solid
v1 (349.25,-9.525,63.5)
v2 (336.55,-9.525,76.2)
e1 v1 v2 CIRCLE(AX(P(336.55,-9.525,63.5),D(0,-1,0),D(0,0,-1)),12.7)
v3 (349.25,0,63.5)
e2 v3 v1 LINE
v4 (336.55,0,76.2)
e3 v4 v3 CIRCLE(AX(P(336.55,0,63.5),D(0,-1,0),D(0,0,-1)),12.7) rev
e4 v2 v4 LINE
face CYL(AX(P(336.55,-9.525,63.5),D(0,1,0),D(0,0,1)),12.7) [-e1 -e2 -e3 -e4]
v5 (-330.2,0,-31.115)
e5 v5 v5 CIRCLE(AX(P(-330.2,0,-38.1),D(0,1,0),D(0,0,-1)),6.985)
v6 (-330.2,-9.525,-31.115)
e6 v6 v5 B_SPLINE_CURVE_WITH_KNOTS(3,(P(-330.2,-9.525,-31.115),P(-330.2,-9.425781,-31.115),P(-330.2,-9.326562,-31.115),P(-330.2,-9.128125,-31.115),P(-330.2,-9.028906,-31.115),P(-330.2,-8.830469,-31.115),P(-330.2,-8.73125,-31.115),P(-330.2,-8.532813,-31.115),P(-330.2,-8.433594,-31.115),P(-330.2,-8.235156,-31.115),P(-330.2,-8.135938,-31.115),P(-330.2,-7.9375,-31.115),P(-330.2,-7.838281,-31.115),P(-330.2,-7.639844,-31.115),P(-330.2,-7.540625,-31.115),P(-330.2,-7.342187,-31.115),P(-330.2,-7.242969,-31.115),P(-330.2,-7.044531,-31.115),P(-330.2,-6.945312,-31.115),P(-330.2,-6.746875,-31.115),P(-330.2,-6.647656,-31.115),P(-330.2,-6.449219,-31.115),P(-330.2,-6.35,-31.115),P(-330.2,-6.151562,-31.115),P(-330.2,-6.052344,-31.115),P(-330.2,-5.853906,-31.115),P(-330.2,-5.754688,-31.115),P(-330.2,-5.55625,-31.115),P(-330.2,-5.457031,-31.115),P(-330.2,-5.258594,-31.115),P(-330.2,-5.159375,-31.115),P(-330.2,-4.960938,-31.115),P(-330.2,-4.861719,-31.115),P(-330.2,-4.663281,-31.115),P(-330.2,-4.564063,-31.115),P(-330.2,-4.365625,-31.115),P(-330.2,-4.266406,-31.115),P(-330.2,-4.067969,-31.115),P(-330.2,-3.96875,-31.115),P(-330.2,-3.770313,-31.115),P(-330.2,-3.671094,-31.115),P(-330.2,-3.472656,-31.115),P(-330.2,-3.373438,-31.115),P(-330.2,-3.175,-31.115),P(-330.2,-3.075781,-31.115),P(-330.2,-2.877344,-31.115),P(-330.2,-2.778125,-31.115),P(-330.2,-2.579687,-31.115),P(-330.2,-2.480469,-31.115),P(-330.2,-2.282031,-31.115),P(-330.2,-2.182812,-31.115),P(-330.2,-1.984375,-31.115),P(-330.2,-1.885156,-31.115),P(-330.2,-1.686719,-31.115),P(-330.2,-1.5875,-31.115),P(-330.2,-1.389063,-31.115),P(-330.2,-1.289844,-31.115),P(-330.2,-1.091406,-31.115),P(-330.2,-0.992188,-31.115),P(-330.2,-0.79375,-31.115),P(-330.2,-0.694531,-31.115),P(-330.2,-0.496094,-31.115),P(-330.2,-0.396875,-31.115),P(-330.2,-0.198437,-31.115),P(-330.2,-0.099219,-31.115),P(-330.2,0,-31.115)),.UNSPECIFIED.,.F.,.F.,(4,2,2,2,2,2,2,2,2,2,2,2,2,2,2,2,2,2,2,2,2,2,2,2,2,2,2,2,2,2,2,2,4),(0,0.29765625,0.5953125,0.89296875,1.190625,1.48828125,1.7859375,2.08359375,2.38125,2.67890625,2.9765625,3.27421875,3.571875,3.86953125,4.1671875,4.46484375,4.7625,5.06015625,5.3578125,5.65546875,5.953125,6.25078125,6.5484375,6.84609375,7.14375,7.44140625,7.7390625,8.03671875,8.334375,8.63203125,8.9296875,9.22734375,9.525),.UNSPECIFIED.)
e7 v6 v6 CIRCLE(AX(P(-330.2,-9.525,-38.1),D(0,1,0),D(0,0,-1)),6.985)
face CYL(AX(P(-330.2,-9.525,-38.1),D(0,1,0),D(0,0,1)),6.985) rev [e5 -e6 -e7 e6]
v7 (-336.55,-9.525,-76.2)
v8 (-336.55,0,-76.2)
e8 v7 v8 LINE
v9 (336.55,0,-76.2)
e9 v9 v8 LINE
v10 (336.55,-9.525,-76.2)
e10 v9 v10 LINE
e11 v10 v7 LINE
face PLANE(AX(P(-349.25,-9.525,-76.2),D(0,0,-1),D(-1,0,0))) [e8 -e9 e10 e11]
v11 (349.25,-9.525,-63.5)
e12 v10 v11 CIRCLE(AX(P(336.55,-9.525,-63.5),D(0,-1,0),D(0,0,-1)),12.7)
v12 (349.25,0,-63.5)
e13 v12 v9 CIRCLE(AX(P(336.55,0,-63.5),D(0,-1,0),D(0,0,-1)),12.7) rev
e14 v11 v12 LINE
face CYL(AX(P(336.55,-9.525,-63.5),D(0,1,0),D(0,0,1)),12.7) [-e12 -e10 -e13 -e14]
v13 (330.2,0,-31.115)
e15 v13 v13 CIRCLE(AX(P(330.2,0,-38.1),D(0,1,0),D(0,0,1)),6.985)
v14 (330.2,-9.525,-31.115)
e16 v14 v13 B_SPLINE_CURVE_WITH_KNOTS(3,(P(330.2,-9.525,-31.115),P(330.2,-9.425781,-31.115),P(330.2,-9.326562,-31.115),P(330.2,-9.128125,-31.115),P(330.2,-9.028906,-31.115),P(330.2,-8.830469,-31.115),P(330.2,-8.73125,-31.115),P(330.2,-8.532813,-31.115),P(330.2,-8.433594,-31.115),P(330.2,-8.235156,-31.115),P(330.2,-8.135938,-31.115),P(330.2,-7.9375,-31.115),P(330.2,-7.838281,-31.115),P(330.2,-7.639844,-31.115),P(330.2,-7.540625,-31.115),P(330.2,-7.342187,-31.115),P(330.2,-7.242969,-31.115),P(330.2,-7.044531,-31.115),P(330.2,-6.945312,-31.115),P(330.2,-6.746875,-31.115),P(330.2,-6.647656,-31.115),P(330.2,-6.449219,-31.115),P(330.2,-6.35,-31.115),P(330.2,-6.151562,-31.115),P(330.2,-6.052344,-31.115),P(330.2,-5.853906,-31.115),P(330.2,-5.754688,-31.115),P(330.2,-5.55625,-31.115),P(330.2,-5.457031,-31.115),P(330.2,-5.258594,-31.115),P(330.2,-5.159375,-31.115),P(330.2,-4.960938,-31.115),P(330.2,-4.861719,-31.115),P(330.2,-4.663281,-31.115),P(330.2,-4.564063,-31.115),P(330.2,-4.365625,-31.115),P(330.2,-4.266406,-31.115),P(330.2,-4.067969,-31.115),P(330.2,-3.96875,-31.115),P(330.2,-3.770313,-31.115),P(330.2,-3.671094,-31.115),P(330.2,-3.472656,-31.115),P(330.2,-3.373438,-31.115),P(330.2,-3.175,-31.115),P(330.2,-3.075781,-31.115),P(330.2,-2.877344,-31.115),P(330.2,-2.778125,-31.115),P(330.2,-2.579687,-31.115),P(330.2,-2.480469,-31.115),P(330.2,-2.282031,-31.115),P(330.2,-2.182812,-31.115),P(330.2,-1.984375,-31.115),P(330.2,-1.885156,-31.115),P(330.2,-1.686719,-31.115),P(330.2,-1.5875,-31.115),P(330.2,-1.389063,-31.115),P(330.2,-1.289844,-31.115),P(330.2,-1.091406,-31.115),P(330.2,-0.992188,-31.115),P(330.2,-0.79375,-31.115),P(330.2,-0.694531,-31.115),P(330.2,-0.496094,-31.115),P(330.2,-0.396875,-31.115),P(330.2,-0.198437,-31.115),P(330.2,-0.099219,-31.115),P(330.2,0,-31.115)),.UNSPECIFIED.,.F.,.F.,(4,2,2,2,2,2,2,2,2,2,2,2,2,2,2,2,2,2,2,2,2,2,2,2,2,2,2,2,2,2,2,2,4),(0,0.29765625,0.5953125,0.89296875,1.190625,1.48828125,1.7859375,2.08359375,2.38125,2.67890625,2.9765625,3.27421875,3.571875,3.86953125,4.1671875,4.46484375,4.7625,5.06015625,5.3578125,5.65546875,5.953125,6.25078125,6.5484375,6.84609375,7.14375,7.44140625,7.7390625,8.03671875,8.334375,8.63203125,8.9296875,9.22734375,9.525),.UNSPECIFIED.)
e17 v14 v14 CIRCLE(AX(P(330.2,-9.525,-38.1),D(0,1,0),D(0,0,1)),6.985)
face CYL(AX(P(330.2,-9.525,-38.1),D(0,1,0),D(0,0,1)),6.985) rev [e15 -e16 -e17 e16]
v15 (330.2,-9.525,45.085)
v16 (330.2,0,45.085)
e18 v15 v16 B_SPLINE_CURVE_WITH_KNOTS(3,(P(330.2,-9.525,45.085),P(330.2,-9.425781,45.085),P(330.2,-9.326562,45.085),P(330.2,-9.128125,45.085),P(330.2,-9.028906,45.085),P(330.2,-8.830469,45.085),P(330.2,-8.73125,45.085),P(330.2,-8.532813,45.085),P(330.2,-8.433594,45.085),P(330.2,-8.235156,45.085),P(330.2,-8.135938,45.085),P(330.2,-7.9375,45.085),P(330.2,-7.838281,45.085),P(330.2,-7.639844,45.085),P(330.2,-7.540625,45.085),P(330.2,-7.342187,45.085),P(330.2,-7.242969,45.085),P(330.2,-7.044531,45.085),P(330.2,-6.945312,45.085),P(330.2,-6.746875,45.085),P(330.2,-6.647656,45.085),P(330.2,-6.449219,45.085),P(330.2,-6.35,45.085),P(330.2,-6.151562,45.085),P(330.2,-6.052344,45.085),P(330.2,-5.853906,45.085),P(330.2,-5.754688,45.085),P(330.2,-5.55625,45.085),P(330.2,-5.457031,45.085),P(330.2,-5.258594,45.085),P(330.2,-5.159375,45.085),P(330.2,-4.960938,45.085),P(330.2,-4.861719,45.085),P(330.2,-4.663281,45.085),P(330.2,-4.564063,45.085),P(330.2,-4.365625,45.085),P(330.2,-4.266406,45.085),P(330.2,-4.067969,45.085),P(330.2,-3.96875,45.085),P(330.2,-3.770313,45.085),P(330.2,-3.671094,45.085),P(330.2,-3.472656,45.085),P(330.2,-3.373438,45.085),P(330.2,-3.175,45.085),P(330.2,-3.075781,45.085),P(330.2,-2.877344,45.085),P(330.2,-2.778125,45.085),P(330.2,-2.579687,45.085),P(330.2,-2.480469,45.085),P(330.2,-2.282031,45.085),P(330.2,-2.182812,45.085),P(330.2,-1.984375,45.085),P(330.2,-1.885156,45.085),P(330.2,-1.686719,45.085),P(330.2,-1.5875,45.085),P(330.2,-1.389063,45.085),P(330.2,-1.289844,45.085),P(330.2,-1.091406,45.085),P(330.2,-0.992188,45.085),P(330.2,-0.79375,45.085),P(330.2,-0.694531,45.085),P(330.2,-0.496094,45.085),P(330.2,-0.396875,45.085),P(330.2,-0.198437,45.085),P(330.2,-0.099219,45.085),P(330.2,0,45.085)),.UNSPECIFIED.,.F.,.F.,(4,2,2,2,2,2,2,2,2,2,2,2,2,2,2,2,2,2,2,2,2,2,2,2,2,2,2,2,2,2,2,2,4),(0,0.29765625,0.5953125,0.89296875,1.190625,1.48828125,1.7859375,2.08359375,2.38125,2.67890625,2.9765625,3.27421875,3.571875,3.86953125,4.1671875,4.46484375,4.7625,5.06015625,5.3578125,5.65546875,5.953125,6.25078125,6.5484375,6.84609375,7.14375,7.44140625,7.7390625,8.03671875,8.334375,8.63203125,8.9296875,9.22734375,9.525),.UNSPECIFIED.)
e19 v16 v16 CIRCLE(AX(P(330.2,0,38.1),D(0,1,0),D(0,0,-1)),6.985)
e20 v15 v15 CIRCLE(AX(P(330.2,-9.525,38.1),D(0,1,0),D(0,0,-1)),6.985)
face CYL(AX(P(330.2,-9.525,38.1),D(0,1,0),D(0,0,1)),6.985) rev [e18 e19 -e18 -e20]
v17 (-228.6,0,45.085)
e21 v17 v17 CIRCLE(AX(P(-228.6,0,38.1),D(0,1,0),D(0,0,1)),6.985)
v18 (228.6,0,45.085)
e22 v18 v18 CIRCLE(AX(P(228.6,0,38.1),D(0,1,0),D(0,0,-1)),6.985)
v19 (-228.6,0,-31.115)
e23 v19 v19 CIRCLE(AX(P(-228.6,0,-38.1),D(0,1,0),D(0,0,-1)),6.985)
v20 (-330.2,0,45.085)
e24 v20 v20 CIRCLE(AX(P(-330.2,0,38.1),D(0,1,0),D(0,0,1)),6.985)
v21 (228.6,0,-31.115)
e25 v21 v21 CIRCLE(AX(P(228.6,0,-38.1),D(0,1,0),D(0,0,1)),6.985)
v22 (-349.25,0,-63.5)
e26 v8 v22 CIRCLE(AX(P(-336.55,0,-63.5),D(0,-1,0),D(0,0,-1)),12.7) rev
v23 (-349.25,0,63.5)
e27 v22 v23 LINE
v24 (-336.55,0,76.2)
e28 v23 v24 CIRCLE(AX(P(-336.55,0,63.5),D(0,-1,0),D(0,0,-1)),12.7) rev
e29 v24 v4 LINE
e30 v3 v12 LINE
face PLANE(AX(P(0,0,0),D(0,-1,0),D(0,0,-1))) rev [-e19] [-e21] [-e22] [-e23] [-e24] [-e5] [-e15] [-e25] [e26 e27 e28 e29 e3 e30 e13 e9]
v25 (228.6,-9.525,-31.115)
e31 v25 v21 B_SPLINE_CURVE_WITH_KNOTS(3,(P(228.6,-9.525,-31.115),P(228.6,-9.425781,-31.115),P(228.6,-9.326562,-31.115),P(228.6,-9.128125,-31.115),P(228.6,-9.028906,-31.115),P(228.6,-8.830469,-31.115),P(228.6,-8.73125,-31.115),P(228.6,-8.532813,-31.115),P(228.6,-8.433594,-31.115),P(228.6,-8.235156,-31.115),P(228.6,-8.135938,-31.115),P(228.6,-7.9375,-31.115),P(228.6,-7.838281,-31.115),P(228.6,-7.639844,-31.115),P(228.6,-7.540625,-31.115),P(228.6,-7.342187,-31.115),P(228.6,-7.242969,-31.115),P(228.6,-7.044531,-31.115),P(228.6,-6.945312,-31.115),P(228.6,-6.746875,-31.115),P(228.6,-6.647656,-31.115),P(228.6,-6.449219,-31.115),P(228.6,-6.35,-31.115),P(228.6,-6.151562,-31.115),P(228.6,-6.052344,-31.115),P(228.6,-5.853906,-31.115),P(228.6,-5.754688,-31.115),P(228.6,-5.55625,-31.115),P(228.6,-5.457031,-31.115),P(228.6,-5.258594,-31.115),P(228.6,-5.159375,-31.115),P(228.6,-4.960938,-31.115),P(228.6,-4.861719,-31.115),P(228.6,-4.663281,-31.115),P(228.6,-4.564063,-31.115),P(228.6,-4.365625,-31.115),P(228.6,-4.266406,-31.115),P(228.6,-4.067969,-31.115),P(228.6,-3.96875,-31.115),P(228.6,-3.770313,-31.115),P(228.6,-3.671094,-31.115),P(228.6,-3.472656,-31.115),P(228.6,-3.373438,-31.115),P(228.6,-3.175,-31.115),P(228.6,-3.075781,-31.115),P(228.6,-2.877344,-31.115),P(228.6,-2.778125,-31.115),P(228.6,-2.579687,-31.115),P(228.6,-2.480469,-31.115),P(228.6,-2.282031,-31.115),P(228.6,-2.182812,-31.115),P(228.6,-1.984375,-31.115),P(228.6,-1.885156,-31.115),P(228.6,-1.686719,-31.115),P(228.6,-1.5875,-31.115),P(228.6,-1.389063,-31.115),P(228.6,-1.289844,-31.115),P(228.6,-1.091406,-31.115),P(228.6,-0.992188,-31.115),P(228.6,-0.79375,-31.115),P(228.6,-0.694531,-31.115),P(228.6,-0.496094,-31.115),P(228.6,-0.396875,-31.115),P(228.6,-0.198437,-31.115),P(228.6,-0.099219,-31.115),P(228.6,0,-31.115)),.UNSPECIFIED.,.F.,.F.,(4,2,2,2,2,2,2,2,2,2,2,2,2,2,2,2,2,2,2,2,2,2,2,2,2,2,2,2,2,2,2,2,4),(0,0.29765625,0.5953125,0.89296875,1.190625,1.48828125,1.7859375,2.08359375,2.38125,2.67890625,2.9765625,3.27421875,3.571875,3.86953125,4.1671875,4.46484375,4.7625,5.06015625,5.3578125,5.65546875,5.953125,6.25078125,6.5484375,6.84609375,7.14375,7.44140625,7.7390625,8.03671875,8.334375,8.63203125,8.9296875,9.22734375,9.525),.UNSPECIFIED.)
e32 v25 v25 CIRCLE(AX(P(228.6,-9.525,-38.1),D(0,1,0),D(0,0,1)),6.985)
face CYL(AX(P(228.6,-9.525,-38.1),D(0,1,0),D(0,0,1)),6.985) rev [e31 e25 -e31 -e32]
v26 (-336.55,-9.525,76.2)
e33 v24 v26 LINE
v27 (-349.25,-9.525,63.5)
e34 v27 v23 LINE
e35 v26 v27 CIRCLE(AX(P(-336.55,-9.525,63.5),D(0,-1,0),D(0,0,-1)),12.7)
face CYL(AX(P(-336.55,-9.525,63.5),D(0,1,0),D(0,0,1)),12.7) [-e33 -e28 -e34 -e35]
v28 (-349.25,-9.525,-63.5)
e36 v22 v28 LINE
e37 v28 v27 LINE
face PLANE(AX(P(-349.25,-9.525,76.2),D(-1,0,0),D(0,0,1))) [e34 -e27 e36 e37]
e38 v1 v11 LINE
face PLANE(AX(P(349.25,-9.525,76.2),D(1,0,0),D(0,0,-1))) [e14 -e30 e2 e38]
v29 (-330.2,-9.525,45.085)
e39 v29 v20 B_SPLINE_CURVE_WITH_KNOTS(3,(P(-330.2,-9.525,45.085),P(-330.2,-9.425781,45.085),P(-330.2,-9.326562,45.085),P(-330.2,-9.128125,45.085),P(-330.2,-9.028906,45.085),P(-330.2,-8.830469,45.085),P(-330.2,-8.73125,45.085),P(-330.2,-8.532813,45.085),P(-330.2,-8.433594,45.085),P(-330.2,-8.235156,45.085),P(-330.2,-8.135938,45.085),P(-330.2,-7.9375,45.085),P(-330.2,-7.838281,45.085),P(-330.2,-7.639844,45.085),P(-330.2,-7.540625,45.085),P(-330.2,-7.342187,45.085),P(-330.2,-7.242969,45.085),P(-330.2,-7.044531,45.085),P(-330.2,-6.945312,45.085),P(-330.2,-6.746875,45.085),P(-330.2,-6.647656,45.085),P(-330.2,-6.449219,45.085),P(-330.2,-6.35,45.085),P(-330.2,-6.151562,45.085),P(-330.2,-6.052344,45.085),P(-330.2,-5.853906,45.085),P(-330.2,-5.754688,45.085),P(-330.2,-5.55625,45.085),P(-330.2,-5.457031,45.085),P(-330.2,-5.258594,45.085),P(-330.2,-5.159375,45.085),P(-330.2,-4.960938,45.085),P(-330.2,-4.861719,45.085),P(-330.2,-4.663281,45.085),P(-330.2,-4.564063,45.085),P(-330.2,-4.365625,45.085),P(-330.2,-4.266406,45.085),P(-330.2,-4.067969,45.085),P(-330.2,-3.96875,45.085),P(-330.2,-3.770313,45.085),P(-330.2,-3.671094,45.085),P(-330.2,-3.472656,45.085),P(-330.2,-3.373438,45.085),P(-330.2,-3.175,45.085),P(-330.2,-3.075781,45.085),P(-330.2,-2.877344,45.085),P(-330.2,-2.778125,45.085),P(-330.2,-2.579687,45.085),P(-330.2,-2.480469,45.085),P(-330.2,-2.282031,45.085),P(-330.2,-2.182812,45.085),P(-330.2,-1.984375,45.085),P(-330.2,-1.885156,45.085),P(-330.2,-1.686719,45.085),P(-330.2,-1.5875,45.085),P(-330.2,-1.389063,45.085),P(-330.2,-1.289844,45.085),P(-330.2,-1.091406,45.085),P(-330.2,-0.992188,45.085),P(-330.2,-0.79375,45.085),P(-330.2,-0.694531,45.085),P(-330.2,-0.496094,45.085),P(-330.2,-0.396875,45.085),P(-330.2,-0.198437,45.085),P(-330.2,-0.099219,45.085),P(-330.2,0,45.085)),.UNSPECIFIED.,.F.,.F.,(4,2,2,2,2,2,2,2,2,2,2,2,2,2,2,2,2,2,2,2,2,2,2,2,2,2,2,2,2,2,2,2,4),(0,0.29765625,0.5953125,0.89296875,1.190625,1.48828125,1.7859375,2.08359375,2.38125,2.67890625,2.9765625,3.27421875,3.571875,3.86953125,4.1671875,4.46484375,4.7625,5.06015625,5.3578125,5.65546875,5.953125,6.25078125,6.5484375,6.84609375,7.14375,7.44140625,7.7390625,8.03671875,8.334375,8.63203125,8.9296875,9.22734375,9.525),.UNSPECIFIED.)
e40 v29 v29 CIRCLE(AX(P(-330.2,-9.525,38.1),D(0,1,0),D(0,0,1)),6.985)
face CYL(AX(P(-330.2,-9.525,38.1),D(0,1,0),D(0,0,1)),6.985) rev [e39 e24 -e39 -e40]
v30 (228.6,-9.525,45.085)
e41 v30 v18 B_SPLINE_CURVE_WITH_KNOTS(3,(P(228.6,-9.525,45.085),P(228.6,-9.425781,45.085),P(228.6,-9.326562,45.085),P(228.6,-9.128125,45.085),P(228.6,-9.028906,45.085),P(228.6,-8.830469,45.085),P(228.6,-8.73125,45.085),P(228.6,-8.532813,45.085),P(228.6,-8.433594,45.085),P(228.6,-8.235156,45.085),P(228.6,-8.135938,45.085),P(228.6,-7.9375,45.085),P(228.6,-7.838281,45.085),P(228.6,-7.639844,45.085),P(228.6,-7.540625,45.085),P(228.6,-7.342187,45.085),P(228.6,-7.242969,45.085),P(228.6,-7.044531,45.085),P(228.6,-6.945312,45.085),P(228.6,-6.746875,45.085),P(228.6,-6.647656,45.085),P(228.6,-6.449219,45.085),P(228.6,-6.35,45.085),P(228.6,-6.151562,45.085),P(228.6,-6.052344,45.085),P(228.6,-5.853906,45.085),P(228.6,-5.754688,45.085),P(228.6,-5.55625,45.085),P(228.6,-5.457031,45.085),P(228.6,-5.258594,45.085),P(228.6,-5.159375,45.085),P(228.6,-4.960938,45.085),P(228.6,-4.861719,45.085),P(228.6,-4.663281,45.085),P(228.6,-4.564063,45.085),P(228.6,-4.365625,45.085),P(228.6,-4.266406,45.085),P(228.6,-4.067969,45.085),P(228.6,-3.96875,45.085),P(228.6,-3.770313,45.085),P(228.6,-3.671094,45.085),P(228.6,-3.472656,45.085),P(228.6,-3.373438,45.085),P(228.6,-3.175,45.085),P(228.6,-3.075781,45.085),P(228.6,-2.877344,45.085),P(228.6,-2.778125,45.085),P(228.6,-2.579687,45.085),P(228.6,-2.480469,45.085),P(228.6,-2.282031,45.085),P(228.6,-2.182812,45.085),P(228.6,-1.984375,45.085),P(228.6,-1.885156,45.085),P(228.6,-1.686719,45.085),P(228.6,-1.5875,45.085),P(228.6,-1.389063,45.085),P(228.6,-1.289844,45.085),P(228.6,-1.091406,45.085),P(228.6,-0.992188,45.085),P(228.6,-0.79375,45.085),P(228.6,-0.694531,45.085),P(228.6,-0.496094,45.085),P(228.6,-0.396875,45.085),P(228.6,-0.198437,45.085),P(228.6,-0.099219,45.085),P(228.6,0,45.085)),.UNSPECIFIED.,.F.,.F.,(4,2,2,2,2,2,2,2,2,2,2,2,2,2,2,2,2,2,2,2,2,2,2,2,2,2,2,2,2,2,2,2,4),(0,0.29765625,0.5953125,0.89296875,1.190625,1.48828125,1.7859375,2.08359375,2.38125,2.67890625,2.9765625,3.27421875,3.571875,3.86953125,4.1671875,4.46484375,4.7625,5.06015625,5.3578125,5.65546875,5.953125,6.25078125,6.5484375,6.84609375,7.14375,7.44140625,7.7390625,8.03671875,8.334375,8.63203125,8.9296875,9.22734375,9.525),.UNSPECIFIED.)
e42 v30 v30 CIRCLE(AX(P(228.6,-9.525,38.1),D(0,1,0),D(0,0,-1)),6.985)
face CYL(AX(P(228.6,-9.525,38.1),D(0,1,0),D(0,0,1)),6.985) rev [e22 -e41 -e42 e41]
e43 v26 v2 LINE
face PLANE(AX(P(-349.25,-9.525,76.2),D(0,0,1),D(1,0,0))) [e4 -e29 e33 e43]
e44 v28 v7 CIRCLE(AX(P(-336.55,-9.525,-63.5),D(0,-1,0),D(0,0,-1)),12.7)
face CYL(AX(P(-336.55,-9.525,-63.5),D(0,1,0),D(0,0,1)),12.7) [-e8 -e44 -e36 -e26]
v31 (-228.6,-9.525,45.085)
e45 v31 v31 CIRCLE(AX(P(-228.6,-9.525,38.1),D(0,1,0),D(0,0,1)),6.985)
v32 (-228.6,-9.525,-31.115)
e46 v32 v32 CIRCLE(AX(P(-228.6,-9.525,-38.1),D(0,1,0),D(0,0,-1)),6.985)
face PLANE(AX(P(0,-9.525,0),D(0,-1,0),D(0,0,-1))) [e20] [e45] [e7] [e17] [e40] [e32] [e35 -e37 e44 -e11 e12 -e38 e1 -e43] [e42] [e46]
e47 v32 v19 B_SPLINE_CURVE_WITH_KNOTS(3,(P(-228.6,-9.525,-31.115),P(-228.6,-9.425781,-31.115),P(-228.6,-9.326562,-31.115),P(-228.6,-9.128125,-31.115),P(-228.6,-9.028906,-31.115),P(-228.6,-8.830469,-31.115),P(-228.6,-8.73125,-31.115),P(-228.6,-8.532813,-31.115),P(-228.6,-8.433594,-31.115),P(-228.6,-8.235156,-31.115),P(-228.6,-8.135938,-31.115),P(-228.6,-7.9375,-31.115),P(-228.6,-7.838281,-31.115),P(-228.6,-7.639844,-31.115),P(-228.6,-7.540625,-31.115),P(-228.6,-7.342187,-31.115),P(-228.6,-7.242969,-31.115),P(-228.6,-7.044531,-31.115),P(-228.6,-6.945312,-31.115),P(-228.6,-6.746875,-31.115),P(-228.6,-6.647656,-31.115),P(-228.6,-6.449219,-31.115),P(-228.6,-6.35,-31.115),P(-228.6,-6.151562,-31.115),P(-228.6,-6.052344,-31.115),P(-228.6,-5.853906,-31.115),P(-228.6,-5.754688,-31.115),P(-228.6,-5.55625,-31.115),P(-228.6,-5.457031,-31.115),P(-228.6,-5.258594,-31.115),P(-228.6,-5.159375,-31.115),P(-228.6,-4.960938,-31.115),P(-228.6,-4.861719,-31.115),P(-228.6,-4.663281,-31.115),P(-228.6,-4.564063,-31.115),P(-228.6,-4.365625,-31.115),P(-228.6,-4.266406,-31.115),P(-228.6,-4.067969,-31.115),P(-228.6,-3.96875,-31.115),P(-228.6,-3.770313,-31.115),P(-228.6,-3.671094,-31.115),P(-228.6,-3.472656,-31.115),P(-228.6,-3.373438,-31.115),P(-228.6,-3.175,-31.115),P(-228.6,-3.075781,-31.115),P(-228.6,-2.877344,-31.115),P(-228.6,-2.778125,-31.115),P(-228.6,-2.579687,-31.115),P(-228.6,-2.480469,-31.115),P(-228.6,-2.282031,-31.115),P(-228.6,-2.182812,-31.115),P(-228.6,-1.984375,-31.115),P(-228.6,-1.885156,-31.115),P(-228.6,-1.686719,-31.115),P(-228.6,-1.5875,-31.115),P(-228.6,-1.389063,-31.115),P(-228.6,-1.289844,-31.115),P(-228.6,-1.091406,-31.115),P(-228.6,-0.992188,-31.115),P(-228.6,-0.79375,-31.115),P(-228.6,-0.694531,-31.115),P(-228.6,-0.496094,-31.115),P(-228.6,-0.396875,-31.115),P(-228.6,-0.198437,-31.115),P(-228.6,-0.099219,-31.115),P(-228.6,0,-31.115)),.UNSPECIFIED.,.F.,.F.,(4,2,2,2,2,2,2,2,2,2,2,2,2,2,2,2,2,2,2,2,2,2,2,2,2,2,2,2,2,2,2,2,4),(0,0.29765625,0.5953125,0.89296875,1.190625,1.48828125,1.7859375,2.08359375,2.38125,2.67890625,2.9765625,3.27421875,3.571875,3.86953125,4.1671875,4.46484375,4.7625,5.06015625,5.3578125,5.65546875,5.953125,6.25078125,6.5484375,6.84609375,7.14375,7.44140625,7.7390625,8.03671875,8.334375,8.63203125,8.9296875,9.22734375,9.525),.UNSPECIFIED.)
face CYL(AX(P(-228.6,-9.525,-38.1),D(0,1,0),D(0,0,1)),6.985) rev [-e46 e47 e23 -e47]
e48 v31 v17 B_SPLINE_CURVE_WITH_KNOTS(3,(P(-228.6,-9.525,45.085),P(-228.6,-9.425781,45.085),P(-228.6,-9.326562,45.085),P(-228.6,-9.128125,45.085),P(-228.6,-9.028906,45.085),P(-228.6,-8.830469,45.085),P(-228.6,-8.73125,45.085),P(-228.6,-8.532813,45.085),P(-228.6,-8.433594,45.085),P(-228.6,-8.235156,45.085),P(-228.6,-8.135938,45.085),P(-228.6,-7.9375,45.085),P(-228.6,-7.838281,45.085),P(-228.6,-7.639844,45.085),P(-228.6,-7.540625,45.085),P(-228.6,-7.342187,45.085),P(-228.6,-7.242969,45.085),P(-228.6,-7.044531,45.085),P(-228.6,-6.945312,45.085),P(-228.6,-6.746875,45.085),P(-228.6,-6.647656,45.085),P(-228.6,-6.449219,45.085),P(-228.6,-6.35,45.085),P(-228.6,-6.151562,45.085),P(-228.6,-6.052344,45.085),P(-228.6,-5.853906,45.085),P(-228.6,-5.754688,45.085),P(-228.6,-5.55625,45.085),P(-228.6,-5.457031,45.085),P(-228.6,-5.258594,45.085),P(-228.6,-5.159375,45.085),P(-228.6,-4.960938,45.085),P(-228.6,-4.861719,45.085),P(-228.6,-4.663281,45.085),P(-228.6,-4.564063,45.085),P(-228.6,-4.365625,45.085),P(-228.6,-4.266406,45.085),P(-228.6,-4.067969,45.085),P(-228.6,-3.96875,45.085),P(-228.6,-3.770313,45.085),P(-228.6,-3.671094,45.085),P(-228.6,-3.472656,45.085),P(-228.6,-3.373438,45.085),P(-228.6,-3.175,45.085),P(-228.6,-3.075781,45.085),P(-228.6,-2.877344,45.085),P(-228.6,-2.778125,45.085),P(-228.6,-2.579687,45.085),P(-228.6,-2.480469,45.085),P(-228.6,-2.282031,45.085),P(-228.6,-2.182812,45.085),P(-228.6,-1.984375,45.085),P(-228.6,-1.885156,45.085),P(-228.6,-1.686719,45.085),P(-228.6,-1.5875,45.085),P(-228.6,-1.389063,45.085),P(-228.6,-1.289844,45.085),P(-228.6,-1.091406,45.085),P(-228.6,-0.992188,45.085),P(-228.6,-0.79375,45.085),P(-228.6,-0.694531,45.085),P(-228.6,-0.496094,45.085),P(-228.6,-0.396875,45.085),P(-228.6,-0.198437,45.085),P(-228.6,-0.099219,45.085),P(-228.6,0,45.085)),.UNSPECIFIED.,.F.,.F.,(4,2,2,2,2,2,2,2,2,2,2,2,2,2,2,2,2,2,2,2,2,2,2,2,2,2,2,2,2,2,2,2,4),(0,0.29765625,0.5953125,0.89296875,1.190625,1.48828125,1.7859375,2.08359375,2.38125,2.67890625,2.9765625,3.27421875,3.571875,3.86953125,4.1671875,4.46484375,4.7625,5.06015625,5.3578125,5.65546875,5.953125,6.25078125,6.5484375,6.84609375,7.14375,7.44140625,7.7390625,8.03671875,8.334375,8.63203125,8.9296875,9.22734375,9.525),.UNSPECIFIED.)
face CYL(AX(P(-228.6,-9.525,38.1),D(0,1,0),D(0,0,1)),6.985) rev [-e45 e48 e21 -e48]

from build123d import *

# Parameters (mm, degrees)
SKETCH1_W          = 698.5
SKETCH1_H          = 152.4
SKETCH1_R          = 6.985
BASE_FLANGE1_DEPTH = 9.525
FILLET1_R          = 12.7


# Sheet-metal steps are written as plain solids
with BuildPart() as part:
    # Sketch1 → Base-Flange1 (new body)
    with BuildSketch(Plane(origin=(0, 0, 0), x_dir=(1, 0, 0), z_dir=(0, 1, 0))):
        Rectangle(SKETCH1_W, SKETCH1_H)
        with Locations(Location((228.6, 38.1, 0), (0, 0, 270))):
            Circle(SKETCH1_R, mode=Mode.SUBTRACT)
        with Locations(Location((330.2, 38.1, 0), (0, 0, 270))):
            Circle(SKETCH1_R, mode=Mode.SUBTRACT)
        with Locations(Location((330.2, -38.1, 0), (0, 0, 270))):
            Circle(SKETCH1_R, mode=Mode.SUBTRACT)
        with Locations(Location((228.6, -38.1, 0), (0, 0, 270))):
            Circle(SKETCH1_R, mode=Mode.SUBTRACT)
        with Locations(Location((-228.6, -38.1, 0), (0, 0, 270))):
            Circle(SKETCH1_R, mode=Mode.SUBTRACT)
        with Locations(Location((-330.2, -38.1, 0), (0, 0, 270))):
            Circle(SKETCH1_R, mode=Mode.SUBTRACT)
        with Locations(Location((-330.2, 38.1, 0), (0, 0, 270))):
            Circle(SKETCH1_R, mode=Mode.SUBTRACT)
        with Locations(Location((-228.6, 38.1, 0), (0, 0, 270))):
            Circle(SKETCH1_R, mode=Mode.SUBTRACT)
    extrude(amount=-BASE_FLANGE1_DEPTH)

    # Fillet1
    fillet1_edges = [part.edges().sort_by_distance(p)[0] for p in [
        (349.25, -4.7625, 76.2),
        (-349.25, -4.7625, 76.2),
        (-349.25, -4.7625, -76.2),
        (349.25, -4.7625, -76.2),
    ]]
    fillet(fillet1_edges, radius=FILLET1_R)


solid = part.part
